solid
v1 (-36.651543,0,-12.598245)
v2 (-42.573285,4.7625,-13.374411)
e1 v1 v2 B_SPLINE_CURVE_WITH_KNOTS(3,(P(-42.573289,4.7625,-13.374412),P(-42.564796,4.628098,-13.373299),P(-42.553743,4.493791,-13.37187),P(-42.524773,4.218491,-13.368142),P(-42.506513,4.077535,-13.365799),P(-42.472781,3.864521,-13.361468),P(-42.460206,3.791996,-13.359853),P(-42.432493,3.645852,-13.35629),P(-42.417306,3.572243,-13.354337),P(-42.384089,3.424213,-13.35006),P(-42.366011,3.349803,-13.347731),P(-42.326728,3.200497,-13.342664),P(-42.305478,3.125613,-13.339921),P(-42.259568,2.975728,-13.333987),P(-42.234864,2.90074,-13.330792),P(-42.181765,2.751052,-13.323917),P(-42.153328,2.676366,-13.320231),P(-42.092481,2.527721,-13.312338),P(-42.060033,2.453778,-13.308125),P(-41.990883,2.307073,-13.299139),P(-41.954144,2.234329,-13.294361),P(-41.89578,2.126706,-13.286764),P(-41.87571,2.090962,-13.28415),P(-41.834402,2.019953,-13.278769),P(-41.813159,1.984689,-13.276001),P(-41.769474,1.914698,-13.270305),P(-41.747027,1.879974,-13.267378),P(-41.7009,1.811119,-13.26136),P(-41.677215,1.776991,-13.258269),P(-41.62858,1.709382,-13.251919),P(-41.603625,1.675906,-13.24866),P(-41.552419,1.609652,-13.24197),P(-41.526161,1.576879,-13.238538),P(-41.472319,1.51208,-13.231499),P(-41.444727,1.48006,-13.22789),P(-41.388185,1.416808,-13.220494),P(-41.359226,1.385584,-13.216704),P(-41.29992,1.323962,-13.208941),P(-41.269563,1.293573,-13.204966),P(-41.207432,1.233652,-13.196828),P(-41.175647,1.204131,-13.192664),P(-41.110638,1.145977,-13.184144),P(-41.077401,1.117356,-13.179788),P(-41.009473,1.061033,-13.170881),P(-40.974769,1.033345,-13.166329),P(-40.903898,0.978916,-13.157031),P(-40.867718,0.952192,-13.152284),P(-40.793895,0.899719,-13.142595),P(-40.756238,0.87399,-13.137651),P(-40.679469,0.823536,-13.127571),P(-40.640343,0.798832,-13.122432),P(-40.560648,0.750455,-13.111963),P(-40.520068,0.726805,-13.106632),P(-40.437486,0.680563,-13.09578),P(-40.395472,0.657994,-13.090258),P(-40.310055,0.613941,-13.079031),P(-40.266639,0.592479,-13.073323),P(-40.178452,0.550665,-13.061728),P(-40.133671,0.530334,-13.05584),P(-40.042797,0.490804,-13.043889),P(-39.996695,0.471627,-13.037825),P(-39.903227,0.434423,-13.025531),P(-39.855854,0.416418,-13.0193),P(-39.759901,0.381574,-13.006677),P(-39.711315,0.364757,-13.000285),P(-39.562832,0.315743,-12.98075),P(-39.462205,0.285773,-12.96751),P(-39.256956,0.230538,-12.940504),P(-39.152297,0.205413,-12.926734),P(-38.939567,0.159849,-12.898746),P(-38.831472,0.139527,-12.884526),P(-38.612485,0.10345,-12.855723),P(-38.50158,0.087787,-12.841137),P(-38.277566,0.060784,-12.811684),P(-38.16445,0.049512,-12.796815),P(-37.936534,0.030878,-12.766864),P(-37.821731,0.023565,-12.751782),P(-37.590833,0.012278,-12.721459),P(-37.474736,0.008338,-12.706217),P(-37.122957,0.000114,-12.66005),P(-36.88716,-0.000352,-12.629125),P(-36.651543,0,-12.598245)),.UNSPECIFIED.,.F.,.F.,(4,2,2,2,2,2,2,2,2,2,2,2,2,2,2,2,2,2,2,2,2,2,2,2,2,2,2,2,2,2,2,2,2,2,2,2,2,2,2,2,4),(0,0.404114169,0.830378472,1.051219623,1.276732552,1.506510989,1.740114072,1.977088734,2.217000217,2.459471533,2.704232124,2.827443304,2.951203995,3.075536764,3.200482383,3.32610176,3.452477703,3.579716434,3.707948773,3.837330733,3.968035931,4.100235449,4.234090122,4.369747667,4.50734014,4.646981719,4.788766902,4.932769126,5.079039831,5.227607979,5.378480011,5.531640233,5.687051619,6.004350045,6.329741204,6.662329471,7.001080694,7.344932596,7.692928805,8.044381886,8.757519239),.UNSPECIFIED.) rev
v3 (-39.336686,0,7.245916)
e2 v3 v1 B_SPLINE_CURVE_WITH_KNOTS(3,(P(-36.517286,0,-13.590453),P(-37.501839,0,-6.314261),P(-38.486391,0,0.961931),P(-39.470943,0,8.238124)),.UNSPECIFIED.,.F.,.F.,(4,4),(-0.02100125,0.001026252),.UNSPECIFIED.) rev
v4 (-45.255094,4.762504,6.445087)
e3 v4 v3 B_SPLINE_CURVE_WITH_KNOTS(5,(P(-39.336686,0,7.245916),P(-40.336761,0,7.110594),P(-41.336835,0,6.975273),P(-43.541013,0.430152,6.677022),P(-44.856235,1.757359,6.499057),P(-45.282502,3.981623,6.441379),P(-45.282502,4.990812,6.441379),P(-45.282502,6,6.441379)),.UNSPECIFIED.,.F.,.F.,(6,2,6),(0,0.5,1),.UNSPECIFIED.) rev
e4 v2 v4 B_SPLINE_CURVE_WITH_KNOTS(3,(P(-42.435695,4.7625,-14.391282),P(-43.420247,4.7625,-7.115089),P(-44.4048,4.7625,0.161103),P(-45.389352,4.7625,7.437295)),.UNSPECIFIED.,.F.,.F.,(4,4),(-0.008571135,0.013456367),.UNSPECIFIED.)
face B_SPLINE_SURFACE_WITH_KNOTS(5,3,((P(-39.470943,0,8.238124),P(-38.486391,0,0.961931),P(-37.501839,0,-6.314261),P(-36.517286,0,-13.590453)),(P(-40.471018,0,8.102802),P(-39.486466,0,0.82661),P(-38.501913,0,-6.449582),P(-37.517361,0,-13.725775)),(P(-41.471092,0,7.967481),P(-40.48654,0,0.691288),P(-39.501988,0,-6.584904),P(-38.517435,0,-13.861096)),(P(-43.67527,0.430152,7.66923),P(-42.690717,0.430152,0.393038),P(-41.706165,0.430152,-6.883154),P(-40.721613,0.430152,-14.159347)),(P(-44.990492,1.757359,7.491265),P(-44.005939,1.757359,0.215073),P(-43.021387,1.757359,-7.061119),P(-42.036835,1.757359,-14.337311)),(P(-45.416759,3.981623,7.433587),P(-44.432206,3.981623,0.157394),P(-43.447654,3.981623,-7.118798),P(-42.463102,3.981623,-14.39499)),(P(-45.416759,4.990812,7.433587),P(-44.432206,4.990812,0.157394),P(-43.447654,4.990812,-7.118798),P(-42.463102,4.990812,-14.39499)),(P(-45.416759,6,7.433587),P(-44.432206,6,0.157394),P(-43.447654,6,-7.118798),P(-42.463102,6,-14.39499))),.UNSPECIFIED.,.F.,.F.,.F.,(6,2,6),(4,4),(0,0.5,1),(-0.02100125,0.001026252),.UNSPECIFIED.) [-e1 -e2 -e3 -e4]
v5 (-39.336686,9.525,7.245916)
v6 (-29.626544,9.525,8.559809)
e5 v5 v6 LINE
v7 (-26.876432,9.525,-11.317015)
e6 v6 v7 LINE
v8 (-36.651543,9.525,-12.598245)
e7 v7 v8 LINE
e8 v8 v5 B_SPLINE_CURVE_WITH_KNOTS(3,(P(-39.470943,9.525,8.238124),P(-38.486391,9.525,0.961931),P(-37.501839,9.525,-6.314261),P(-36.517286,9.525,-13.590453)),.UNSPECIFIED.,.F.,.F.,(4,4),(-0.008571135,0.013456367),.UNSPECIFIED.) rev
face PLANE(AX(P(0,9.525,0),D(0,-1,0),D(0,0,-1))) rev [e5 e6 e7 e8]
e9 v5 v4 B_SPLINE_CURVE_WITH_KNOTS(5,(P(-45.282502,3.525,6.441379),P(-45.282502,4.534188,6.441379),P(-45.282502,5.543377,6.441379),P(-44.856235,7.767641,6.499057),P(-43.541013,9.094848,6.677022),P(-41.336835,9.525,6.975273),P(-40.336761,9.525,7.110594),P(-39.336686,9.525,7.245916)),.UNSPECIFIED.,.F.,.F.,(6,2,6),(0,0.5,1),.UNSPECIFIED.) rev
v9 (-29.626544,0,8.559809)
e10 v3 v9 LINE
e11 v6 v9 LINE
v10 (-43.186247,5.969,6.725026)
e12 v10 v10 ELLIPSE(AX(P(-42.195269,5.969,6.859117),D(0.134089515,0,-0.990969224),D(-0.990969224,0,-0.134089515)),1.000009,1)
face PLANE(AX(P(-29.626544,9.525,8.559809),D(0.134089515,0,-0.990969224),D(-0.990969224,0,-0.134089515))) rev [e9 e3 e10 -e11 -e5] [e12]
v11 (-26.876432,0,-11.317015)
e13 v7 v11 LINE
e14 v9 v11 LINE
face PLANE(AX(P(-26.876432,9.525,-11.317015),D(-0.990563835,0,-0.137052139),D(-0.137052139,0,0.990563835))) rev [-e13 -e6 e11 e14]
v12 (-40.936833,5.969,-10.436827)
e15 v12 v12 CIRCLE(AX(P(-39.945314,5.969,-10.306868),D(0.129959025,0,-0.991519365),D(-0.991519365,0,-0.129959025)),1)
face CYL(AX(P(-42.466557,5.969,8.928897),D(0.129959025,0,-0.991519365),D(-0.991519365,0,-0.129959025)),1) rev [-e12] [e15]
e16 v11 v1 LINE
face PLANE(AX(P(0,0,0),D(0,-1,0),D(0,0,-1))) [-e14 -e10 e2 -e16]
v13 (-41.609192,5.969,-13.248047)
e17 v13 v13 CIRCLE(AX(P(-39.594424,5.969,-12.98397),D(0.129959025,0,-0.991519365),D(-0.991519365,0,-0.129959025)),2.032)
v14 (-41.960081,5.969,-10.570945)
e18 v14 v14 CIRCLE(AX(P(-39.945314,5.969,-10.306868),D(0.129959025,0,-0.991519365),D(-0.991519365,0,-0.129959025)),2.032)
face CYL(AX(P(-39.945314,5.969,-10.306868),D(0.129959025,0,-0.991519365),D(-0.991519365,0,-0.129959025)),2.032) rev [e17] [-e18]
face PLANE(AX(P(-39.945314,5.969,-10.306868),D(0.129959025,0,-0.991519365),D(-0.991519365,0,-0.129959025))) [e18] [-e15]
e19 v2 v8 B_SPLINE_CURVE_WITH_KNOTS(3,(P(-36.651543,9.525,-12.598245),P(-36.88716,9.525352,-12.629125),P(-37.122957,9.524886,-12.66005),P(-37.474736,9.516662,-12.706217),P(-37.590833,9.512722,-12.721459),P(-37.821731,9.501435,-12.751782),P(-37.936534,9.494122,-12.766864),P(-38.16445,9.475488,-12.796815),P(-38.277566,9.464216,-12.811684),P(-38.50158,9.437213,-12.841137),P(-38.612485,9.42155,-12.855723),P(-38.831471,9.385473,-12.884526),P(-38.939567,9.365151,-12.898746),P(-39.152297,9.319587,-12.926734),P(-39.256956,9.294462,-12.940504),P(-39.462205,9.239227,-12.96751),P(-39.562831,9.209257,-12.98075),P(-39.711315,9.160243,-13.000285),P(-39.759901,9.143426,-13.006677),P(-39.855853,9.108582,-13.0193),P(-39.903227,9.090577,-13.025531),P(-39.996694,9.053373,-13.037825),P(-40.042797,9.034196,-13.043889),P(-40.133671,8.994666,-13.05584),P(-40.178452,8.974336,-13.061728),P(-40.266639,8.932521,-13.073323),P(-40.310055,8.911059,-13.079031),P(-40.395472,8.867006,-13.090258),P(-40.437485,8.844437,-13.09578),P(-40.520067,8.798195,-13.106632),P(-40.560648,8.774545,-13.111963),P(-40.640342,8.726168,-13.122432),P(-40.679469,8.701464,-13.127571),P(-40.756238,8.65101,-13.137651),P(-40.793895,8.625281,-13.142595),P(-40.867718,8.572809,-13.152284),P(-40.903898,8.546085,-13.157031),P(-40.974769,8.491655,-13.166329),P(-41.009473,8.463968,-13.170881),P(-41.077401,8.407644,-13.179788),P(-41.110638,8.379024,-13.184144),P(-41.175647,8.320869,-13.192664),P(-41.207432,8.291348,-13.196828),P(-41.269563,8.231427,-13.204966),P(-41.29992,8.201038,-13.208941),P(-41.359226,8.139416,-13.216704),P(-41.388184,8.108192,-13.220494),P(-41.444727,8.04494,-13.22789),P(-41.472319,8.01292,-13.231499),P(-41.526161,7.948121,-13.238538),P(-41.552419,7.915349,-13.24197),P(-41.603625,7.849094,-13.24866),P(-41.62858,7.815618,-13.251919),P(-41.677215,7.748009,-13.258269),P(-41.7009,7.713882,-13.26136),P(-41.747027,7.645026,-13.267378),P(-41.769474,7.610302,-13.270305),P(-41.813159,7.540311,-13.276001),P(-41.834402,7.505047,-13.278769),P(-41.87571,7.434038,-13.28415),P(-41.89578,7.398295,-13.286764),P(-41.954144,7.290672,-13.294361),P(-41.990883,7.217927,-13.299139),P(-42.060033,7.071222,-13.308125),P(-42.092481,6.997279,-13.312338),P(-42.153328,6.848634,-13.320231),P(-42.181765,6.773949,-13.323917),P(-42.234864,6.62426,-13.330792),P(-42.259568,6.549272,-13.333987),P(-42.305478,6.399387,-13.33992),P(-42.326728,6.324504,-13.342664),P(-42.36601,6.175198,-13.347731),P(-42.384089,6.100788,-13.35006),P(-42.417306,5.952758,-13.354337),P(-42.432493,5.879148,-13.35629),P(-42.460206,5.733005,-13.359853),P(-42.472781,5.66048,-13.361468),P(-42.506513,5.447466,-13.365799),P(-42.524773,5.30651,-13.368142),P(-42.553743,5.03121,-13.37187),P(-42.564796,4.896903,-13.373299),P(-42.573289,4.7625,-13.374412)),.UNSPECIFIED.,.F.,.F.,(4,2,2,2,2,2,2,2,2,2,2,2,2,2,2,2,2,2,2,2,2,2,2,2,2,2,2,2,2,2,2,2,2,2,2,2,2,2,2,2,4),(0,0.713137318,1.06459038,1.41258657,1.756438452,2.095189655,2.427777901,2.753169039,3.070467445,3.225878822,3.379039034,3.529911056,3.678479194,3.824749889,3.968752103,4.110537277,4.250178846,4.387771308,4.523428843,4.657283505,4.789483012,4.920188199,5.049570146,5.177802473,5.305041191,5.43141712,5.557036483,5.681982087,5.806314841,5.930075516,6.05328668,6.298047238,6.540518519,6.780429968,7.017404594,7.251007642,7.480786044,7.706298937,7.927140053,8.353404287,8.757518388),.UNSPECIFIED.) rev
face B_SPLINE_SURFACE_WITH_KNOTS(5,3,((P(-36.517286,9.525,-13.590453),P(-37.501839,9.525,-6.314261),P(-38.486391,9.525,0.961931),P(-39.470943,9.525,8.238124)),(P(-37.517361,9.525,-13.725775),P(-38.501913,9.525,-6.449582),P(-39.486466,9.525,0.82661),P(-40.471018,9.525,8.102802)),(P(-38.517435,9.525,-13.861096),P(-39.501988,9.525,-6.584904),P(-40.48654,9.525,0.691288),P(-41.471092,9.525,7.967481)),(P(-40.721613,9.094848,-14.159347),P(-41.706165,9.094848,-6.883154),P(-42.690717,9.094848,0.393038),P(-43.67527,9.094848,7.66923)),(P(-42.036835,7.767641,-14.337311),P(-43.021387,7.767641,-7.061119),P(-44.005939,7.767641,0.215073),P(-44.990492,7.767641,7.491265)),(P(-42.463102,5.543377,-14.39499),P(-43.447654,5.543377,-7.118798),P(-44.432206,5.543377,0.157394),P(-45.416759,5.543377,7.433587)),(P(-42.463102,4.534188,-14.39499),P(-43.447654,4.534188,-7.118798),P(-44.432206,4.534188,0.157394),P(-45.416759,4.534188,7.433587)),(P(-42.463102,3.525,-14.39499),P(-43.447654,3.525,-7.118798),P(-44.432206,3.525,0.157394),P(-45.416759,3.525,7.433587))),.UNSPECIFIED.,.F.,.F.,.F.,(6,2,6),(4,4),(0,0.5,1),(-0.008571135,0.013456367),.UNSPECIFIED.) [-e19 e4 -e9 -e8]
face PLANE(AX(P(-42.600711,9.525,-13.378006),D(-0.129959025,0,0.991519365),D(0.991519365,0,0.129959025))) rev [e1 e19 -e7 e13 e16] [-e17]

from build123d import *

# Parameters (mm, degrees)
BOSS_EXTRUDE1_DEPTH = 9.525
SKETCH3_R           = 2.032
CUT_EXTRUDE1_DEPTH  = 2.7
SKETCH4_R           = 1.000000032
CUT_EXTRUDE2_DEPTH  = 49.829451626
FILLET2_SIZE        = 6


with BuildPart() as part:
    # Sketch1 → Boss-Extrude1 (new body)
    with BuildSketch(Plane(origin=(0, 0, 0), x_dir=(1, 0, 0), z_dir=(0, 1, 0))):
        Polygon((-29.626544256, -8.559809399), (-45.282501527, -6.441378612), (-42.600711235, 13.378005859), (-26.876432388, 11.317015404), align=None)
    extrude(amount=BOSS_EXTRUDE1_DEPTH)

    # Sketch3 → Cut-Extrude1 (cut)
    with BuildSketch(Plane(origin=(1.004349985, 0, -7.662664899), x_dir=(-0.9915193653276276, 0, -0.12995902500518686), z_dir=(0.12995902500518686, 0, -0.9915193653276276))):
        with Locations((40.946022732, 5.969)):
            Circle(SKETCH3_R)
    extrude(amount=-CUT_EXTRUDE1_DEPTH, mode=Mode.SUBTRACT)

    # Sketch4 → Cut-Extrude2 (cut, through all)
    with BuildSketch(Plane(origin=(0.653460617, 0, -4.985562613), x_dir=(-0.9915193653276276, 0, -0.12995902500518688), z_dir=(0.12995902500518688, 0, -0.9915193653276276))):
        with Locations((40.946022732, 5.969)):
            Circle(SKETCH4_R)
    extrude(amount=-CUT_EXTRUDE2_DEPTH, mode=Mode.SUBTRACT)

    # Fillet2
    # a fillet whose section is not a circle: 6 mm, written as the material it takes off along each edge
    with BuildSketch(Plane(origin=(-47.293844247, 9.525, 21.305916966), x_dir=(0.9909692235697757, 0, 0.13408951464419594), z_dir=(0.13408951464419594, 0, -0.9909692235697757))) as fillet2_piece_1:
        with BuildLine():
            add(Edge.make_bspline([(FILLET2_SIZE, 0), (FILLET2_SIZE * 0.831801948466, 0), (FILLET2_SIZE * 0.663603896932, 0), (FILLET2_SIZE * 0.292893218813, FILLET2_SIZE * 0.0716919198361), (FILLET2_SIZE * 0.0716919198361, FILLET2_SIZE * 0.292893218813), (0, FILLET2_SIZE * 0.663603896932), (0, FILLET2_SIZE * 0.831801948466), (0, FILLET2_SIZE)], knots=[0, 0, 0, 0, 0, 0, 0.5, 0.5, 1, 1, 1, 1, 1, 1], degree=5))
            Line((0, FILLET2_SIZE), (0, 0))
            Line((0, 0), (FILLET2_SIZE, 0))
        make_face()
    extrude(amount=50, mode=Mode.SUBTRACT)
    with BuildSketch(Plane(origin=(-47.293844247, 0, 21.305916966), x_dir=(0.9909692235697757, 0, 0.13408951464419594), z_dir=(0.13408951464419594, 0, -0.9909692235697757))) as fillet2_piece_2:
        with BuildLine():
            add(Edge.make_bspline([(FILLET2_SIZE, 0), (FILLET2_SIZE * 0.831801948466, 0), (FILLET2_SIZE * 0.663603896932, 0), (FILLET2_SIZE * 0.292893218813, -FILLET2_SIZE * 0.0716919198361), (FILLET2_SIZE * 0.0716919198361, -FILLET2_SIZE * 0.292893218813), (0, -FILLET2_SIZE * 0.663603896932), (0, -FILLET2_SIZE * 0.831801948466), (0, -FILLET2_SIZE)], knots=[0, 0, 0, 0, 0, 0, 0.5, 0.5, 1, 1, 1, 1, 1, 1], degree=5))
            Line((0, -FILLET2_SIZE), (0, 0))
            Line((0, 0), (FILLET2_SIZE, 0))
        make_face()
    extrude(amount=50, mode=Mode.SUBTRACT)


solid = part.part
